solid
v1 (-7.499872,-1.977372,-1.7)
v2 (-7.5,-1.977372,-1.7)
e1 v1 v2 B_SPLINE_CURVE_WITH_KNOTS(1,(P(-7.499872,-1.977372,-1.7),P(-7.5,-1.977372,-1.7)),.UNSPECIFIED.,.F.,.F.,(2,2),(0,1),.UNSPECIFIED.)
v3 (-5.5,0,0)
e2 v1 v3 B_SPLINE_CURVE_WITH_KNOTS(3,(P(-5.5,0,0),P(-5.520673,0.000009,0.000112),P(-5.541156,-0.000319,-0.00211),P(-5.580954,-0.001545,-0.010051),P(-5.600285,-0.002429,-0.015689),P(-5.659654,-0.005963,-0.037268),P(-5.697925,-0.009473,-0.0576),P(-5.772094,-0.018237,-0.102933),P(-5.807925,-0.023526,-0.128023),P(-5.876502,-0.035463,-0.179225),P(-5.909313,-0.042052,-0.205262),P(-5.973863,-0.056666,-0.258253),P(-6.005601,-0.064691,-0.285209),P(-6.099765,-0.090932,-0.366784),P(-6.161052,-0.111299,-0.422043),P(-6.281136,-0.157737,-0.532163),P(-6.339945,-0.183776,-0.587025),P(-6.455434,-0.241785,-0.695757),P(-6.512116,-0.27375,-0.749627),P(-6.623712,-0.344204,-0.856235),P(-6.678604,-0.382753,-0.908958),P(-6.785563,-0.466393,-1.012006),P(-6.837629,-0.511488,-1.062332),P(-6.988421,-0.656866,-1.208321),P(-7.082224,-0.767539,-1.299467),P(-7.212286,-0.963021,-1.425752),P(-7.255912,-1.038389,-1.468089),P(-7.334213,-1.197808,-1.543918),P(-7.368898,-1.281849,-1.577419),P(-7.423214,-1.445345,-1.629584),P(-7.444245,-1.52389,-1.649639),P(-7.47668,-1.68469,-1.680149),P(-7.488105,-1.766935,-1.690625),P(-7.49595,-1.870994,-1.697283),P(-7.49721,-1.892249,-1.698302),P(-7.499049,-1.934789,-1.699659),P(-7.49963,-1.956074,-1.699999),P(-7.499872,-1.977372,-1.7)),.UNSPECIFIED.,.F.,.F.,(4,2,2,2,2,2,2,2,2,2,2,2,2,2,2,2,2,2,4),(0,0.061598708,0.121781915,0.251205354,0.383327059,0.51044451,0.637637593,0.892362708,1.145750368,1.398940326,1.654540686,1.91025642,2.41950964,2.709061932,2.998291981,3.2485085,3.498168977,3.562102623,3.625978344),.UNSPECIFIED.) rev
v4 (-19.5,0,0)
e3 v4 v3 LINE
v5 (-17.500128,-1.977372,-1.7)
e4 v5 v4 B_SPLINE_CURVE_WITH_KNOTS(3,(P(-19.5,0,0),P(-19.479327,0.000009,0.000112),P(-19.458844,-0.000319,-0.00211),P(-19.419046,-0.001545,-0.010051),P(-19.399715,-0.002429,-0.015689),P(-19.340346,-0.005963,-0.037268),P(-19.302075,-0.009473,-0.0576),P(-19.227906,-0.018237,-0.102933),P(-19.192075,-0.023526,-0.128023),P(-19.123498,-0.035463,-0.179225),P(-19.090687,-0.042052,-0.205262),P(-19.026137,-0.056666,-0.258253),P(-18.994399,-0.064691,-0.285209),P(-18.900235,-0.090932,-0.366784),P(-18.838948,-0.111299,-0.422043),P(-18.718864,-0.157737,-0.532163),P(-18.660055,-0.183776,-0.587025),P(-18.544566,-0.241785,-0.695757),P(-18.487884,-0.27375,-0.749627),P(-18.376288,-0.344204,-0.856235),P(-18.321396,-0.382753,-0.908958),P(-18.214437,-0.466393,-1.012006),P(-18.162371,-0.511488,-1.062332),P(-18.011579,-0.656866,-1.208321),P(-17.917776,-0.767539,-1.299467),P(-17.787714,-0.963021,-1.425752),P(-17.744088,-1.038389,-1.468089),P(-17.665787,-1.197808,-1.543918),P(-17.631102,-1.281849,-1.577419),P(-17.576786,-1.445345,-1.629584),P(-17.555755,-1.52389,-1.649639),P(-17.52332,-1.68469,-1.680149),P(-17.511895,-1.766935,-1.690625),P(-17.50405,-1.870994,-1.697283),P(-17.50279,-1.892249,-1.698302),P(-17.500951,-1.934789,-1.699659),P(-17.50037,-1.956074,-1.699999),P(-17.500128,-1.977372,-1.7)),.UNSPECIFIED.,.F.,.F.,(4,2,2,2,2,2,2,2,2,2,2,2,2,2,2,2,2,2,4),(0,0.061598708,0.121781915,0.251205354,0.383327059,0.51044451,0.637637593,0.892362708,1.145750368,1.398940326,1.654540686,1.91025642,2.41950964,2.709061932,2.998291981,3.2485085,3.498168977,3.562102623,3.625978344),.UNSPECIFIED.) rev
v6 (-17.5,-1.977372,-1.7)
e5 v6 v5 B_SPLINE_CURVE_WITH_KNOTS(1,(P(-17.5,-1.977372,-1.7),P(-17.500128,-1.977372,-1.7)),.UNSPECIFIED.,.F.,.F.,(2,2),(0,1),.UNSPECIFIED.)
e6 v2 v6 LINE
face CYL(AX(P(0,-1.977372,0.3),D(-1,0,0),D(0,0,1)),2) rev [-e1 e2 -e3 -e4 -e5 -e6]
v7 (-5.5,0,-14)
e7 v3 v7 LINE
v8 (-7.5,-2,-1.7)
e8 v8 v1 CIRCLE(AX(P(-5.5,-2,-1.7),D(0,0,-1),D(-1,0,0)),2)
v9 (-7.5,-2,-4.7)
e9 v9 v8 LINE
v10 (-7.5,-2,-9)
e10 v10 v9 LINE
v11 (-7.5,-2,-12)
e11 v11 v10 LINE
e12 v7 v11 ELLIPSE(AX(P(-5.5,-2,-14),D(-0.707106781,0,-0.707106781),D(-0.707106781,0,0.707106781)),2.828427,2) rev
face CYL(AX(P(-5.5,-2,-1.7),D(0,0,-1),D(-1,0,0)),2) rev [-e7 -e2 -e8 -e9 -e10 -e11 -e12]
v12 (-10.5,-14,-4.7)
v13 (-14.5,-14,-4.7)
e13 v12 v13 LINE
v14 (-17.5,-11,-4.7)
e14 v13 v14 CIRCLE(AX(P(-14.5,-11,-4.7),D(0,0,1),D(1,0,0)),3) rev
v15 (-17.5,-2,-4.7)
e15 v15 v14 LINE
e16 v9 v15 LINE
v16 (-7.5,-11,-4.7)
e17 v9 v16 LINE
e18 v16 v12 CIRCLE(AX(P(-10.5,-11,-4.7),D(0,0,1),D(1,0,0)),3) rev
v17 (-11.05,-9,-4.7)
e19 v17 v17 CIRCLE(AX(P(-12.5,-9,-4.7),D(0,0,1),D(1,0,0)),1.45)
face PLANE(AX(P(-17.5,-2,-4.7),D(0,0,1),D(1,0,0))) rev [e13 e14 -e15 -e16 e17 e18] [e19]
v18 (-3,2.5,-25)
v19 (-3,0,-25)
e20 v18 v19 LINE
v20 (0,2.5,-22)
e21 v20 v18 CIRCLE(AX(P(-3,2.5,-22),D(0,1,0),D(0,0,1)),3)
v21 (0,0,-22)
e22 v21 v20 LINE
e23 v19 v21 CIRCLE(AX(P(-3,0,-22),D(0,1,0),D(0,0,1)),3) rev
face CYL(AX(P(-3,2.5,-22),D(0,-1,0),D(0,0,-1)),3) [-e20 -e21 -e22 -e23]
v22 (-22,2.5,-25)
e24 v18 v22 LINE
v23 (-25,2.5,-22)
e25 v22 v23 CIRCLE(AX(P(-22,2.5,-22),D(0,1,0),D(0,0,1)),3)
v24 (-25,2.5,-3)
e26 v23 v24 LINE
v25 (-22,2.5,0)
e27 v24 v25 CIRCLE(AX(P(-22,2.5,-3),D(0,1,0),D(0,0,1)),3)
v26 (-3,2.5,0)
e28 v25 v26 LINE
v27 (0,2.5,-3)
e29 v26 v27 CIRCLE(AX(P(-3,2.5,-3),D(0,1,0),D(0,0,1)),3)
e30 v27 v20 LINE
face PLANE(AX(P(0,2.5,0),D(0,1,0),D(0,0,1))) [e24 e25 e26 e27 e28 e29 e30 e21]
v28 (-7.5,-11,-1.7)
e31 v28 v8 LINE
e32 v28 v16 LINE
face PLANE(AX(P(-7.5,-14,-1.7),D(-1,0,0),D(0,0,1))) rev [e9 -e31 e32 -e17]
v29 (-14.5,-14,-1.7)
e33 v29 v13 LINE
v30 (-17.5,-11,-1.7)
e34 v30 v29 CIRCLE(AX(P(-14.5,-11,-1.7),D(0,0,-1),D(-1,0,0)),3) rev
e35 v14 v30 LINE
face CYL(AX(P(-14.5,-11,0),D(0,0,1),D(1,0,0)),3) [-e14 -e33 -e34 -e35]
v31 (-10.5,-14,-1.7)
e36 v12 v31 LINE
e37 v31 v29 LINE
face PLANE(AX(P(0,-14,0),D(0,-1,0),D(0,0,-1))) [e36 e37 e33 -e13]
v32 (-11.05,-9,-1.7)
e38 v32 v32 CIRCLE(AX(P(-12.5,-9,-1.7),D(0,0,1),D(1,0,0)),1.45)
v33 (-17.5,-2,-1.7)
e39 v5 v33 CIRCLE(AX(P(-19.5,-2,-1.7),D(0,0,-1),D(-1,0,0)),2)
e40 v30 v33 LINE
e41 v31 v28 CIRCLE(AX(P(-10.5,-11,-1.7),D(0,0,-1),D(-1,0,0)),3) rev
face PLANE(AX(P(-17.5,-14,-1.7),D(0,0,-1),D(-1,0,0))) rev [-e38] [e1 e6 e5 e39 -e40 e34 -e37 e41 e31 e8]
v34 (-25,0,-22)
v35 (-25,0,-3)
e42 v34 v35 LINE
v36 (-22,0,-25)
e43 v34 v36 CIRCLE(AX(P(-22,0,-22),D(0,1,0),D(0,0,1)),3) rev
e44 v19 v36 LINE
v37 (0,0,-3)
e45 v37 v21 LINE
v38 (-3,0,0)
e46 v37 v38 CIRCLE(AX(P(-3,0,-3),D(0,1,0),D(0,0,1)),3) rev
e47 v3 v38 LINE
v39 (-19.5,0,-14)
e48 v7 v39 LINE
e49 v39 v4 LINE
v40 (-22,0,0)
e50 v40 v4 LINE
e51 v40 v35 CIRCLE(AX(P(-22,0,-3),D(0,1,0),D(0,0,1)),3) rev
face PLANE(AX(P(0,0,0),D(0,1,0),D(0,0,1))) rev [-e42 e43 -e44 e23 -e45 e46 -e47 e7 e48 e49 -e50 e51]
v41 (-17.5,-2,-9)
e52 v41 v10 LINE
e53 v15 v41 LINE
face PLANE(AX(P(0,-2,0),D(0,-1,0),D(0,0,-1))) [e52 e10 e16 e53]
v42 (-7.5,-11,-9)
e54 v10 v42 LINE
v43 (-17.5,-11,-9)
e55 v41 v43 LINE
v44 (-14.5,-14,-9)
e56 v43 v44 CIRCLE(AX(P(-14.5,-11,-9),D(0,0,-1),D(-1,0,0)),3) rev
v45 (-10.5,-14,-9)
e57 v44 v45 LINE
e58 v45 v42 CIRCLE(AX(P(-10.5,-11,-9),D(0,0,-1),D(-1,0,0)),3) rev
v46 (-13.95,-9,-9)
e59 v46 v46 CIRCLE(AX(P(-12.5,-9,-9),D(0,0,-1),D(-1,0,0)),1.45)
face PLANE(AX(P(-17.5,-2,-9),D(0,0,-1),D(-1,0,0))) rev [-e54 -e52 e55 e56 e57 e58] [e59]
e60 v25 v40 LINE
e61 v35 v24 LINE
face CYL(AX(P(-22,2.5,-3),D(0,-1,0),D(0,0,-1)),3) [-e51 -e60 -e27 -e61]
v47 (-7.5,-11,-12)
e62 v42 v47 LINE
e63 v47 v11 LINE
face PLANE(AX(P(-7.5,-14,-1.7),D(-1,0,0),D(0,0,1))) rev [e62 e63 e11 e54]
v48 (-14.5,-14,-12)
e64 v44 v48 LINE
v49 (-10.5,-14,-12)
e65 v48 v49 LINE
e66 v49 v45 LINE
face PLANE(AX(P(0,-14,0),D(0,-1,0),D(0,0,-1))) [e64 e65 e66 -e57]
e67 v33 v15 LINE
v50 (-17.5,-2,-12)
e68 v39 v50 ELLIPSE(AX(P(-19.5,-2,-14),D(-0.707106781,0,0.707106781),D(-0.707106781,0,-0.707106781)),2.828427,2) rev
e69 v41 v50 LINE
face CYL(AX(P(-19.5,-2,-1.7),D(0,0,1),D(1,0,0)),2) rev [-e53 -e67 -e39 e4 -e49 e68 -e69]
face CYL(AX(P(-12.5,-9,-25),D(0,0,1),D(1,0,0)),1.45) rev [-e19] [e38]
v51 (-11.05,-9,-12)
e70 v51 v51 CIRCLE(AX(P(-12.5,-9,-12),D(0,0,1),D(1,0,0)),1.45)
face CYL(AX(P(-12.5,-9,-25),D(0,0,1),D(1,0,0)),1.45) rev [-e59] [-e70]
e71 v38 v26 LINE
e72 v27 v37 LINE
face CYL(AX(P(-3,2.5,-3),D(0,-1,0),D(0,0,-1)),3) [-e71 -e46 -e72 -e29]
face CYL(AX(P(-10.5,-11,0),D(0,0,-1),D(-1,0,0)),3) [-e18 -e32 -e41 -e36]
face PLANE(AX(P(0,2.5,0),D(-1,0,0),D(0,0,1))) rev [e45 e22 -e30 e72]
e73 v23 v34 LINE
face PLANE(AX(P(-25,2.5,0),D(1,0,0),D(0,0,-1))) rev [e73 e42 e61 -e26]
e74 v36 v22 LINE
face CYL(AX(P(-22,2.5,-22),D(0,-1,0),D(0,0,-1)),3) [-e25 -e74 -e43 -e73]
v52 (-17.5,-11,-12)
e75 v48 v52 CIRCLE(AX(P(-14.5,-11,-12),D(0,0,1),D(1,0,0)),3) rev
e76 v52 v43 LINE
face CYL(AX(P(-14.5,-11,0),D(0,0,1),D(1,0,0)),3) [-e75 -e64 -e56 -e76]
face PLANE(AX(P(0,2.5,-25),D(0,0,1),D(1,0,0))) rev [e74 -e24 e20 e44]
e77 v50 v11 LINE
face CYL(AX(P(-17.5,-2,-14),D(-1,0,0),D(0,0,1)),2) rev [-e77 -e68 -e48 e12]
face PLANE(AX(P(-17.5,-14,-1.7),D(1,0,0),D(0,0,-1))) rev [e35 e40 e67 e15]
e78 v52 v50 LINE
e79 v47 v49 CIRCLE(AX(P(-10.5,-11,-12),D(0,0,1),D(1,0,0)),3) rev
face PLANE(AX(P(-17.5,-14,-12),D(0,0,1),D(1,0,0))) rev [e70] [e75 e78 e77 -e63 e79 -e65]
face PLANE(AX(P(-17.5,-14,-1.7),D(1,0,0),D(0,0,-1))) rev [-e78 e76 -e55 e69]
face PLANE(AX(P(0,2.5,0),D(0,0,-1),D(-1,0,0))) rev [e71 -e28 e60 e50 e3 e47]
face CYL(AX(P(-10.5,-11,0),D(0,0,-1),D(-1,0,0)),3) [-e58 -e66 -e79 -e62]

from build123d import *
from build123d.topology import SkipClean

# Parameters (mm, degrees)
SKETCH1_W           = 25
SKETCH1_H           = 25
BOSS_EXTRUDE1_DEPTH = 2.5
SKETCH2_W           = 10
SKETCH2_H           = 10.3
BOSS_EXTRUDE2_DEPTH = 14
SKETCH3_W           = 10
SKETCH3_H           = 4.3
CUT_EXTRUDE1_DEPTH  = 12
SKETCH4_R           = 1.45
CUT_EXTRUDE2_DEPTH  = 37.930881387
FILLET1_R           = 3
FILLET2_R           = 3
FILLET3_START       = -12
FILLET3_DEPTH       = 10.3
FILLET3_START_2     = -19.5000001
FILLET3_2_DEPTH     = 14.0000001
FILLET3_START_3     = -15
FILLET3_3_DEPTH     = 15.00001976


with BuildPart() as part:
    # Sketch1 → Boss-Extrude1 (new body)
    with BuildSketch(Plane(origin=(0, 0, 0), x_dir=(1, 0, 0), z_dir=(0, 1, 0))):
        with Locations((-12.5, 12.5)):
            Rectangle(SKETCH1_W, SKETCH1_H)
    extrude(amount=BOSS_EXTRUDE1_DEPTH)

    # Sketch2 → Boss-Extrude2 (add)
    with BuildSketch(Plane(origin=(0, 0, 0), x_dir=(-1, 0, 0), z_dir=(0, -1, 0))):
        with Locations((12.5, 6.85)):
            Rectangle(SKETCH2_W, SKETCH2_H)
    extrude(amount=BOSS_EXTRUDE2_DEPTH)

    # Sketch3 → Cut-Extrude1 (cut)
    with BuildSketch(Plane(origin=(0, -14, 0), x_dir=(-1, 0, 0), z_dir=(0, -1, 0))):
        with Locations((12.5, 6.85)):
            Rectangle(SKETCH3_W, SKETCH3_H)
    extrude(amount=-CUT_EXTRUDE1_DEPTH, mode=Mode.SUBTRACT)

    # Sketch4 → Cut-Extrude2 (cut, through all)
    with BuildSketch(Plane.XY.offset(-1.7)):
        with Locations((-12.5, -9)):
            Circle(SKETCH4_R)
    extrude(amount=-CUT_EXTRUDE2_DEPTH, mode=Mode.SUBTRACT)

    # Fillet1
    fillet1_edges = [part.edges().sort_by_distance(p)[0] for p in [
        (-17.5, -14, -3.2),
        (-7.5, -14, -10.5),
        (-17.5, -14, -10.5),
        (-7.5, -14, -3.2),
    ]]
    fillet(fillet1_edges, radius=FILLET1_R)

    # Fillet2
    fillet2_edges = [part.edges().sort_by_distance(p)[0] for p in [
        (0, 1.25, 0),
        (-25, 1.25, 0),
        (-25, 1.25, -25),
        (0, 1.25, -25),
    ]]
    fillet(fillet2_edges, radius=FILLET2_R)

    # Fillet3: read off the stored shape, not the designer's step
    # Fillet3 outline → Fillet3 (add)
    with BuildSketch(Plane.XY.offset(FILLET3_START)):
        with BuildLine():
            Line((-7.5, 0), (-7.5, -2))
            ThreePointArc((-7.5, -2), (-6.914213562, -0.585786438), (-5.5, 0))
            Line((-5.5, 0), (-7.5, 0))
        make_face()
        with BuildLine():
            Line((-17.5, -2), (-17.5, 0))
            Line((-17.5, 0), (-19.5, 0))
            ThreePointArc((-19.5, 0), (-18.085786438, -0.585786438), (-17.5, -2))
        make_face()
    extrude(amount=FILLET3_DEPTH)

    # Fillet3 2 outline → Fillet3 2 (add)
    with BuildSketch(Plane.YZ.offset(FILLET3_START_2)):
        with BuildLine():
            Line((0, -1.7), (1.1224e-05, 7.3987e-05))
            ThreePointArc((1.1224e-05, 7.3987e-05), (-0.67350314, -1.216550696), (-1.977371993, -1.7))
            Line((-1.977371993, -1.7), (0, -1.7))
        make_face()
        with BuildLine():
            Line((0, -14), (0, -12))
            Line((0, -12), (-2, -12))
            ThreePointArc((-2, -12), (-0.585786438, -12.585786438), (0, -14))
        make_face()
    extrude(amount=FILLET3_2_DEPTH)

    # Fillet3 3 outline → Fillet3 3 (cut)
    with SkipClean():  # the faces are left unmerged after this step: merging them gives an invalid solid
        with BuildSketch(Plane.XY.offset(FILLET3_START_3)):
            with BuildLine():
                ThreePointArc((-5.5, 0), (-6.914213562, -0.585786438), (-7.5, -2))
                Line((-7.5, -2), (-7.500000001, -3))
                Line((-7.500000001, -3), (-5.5, -3))
                Line((-5.5, -3), (-5.5, -2))
                Line((-5.5, -2), (-5.5, -1.977371993))
                Line((-5.5, -1.977371993), (-5.5, 0))
            make_face()
            with BuildLine():
                Line((-19.5000001, -3), (-17.499999999, -3))
                Line((-17.499999999, -3), (-17.5, -2))
                ThreePointArc((-17.5, -2), (-18.085786438, -0.585786438), (-19.5, 0))
                Line((-19.5, 0), (-19.5000001, -1.977371993))
                Line((-19.5000001, -1.977371993), (-19.5000001, -2))
                Line((-19.5000001, -2), (-19.5000001, -3))
            make_face()
        extrude(amount=FILLET3_3_DEPTH, mode=Mode.SUBTRACT)


solid = part.part
